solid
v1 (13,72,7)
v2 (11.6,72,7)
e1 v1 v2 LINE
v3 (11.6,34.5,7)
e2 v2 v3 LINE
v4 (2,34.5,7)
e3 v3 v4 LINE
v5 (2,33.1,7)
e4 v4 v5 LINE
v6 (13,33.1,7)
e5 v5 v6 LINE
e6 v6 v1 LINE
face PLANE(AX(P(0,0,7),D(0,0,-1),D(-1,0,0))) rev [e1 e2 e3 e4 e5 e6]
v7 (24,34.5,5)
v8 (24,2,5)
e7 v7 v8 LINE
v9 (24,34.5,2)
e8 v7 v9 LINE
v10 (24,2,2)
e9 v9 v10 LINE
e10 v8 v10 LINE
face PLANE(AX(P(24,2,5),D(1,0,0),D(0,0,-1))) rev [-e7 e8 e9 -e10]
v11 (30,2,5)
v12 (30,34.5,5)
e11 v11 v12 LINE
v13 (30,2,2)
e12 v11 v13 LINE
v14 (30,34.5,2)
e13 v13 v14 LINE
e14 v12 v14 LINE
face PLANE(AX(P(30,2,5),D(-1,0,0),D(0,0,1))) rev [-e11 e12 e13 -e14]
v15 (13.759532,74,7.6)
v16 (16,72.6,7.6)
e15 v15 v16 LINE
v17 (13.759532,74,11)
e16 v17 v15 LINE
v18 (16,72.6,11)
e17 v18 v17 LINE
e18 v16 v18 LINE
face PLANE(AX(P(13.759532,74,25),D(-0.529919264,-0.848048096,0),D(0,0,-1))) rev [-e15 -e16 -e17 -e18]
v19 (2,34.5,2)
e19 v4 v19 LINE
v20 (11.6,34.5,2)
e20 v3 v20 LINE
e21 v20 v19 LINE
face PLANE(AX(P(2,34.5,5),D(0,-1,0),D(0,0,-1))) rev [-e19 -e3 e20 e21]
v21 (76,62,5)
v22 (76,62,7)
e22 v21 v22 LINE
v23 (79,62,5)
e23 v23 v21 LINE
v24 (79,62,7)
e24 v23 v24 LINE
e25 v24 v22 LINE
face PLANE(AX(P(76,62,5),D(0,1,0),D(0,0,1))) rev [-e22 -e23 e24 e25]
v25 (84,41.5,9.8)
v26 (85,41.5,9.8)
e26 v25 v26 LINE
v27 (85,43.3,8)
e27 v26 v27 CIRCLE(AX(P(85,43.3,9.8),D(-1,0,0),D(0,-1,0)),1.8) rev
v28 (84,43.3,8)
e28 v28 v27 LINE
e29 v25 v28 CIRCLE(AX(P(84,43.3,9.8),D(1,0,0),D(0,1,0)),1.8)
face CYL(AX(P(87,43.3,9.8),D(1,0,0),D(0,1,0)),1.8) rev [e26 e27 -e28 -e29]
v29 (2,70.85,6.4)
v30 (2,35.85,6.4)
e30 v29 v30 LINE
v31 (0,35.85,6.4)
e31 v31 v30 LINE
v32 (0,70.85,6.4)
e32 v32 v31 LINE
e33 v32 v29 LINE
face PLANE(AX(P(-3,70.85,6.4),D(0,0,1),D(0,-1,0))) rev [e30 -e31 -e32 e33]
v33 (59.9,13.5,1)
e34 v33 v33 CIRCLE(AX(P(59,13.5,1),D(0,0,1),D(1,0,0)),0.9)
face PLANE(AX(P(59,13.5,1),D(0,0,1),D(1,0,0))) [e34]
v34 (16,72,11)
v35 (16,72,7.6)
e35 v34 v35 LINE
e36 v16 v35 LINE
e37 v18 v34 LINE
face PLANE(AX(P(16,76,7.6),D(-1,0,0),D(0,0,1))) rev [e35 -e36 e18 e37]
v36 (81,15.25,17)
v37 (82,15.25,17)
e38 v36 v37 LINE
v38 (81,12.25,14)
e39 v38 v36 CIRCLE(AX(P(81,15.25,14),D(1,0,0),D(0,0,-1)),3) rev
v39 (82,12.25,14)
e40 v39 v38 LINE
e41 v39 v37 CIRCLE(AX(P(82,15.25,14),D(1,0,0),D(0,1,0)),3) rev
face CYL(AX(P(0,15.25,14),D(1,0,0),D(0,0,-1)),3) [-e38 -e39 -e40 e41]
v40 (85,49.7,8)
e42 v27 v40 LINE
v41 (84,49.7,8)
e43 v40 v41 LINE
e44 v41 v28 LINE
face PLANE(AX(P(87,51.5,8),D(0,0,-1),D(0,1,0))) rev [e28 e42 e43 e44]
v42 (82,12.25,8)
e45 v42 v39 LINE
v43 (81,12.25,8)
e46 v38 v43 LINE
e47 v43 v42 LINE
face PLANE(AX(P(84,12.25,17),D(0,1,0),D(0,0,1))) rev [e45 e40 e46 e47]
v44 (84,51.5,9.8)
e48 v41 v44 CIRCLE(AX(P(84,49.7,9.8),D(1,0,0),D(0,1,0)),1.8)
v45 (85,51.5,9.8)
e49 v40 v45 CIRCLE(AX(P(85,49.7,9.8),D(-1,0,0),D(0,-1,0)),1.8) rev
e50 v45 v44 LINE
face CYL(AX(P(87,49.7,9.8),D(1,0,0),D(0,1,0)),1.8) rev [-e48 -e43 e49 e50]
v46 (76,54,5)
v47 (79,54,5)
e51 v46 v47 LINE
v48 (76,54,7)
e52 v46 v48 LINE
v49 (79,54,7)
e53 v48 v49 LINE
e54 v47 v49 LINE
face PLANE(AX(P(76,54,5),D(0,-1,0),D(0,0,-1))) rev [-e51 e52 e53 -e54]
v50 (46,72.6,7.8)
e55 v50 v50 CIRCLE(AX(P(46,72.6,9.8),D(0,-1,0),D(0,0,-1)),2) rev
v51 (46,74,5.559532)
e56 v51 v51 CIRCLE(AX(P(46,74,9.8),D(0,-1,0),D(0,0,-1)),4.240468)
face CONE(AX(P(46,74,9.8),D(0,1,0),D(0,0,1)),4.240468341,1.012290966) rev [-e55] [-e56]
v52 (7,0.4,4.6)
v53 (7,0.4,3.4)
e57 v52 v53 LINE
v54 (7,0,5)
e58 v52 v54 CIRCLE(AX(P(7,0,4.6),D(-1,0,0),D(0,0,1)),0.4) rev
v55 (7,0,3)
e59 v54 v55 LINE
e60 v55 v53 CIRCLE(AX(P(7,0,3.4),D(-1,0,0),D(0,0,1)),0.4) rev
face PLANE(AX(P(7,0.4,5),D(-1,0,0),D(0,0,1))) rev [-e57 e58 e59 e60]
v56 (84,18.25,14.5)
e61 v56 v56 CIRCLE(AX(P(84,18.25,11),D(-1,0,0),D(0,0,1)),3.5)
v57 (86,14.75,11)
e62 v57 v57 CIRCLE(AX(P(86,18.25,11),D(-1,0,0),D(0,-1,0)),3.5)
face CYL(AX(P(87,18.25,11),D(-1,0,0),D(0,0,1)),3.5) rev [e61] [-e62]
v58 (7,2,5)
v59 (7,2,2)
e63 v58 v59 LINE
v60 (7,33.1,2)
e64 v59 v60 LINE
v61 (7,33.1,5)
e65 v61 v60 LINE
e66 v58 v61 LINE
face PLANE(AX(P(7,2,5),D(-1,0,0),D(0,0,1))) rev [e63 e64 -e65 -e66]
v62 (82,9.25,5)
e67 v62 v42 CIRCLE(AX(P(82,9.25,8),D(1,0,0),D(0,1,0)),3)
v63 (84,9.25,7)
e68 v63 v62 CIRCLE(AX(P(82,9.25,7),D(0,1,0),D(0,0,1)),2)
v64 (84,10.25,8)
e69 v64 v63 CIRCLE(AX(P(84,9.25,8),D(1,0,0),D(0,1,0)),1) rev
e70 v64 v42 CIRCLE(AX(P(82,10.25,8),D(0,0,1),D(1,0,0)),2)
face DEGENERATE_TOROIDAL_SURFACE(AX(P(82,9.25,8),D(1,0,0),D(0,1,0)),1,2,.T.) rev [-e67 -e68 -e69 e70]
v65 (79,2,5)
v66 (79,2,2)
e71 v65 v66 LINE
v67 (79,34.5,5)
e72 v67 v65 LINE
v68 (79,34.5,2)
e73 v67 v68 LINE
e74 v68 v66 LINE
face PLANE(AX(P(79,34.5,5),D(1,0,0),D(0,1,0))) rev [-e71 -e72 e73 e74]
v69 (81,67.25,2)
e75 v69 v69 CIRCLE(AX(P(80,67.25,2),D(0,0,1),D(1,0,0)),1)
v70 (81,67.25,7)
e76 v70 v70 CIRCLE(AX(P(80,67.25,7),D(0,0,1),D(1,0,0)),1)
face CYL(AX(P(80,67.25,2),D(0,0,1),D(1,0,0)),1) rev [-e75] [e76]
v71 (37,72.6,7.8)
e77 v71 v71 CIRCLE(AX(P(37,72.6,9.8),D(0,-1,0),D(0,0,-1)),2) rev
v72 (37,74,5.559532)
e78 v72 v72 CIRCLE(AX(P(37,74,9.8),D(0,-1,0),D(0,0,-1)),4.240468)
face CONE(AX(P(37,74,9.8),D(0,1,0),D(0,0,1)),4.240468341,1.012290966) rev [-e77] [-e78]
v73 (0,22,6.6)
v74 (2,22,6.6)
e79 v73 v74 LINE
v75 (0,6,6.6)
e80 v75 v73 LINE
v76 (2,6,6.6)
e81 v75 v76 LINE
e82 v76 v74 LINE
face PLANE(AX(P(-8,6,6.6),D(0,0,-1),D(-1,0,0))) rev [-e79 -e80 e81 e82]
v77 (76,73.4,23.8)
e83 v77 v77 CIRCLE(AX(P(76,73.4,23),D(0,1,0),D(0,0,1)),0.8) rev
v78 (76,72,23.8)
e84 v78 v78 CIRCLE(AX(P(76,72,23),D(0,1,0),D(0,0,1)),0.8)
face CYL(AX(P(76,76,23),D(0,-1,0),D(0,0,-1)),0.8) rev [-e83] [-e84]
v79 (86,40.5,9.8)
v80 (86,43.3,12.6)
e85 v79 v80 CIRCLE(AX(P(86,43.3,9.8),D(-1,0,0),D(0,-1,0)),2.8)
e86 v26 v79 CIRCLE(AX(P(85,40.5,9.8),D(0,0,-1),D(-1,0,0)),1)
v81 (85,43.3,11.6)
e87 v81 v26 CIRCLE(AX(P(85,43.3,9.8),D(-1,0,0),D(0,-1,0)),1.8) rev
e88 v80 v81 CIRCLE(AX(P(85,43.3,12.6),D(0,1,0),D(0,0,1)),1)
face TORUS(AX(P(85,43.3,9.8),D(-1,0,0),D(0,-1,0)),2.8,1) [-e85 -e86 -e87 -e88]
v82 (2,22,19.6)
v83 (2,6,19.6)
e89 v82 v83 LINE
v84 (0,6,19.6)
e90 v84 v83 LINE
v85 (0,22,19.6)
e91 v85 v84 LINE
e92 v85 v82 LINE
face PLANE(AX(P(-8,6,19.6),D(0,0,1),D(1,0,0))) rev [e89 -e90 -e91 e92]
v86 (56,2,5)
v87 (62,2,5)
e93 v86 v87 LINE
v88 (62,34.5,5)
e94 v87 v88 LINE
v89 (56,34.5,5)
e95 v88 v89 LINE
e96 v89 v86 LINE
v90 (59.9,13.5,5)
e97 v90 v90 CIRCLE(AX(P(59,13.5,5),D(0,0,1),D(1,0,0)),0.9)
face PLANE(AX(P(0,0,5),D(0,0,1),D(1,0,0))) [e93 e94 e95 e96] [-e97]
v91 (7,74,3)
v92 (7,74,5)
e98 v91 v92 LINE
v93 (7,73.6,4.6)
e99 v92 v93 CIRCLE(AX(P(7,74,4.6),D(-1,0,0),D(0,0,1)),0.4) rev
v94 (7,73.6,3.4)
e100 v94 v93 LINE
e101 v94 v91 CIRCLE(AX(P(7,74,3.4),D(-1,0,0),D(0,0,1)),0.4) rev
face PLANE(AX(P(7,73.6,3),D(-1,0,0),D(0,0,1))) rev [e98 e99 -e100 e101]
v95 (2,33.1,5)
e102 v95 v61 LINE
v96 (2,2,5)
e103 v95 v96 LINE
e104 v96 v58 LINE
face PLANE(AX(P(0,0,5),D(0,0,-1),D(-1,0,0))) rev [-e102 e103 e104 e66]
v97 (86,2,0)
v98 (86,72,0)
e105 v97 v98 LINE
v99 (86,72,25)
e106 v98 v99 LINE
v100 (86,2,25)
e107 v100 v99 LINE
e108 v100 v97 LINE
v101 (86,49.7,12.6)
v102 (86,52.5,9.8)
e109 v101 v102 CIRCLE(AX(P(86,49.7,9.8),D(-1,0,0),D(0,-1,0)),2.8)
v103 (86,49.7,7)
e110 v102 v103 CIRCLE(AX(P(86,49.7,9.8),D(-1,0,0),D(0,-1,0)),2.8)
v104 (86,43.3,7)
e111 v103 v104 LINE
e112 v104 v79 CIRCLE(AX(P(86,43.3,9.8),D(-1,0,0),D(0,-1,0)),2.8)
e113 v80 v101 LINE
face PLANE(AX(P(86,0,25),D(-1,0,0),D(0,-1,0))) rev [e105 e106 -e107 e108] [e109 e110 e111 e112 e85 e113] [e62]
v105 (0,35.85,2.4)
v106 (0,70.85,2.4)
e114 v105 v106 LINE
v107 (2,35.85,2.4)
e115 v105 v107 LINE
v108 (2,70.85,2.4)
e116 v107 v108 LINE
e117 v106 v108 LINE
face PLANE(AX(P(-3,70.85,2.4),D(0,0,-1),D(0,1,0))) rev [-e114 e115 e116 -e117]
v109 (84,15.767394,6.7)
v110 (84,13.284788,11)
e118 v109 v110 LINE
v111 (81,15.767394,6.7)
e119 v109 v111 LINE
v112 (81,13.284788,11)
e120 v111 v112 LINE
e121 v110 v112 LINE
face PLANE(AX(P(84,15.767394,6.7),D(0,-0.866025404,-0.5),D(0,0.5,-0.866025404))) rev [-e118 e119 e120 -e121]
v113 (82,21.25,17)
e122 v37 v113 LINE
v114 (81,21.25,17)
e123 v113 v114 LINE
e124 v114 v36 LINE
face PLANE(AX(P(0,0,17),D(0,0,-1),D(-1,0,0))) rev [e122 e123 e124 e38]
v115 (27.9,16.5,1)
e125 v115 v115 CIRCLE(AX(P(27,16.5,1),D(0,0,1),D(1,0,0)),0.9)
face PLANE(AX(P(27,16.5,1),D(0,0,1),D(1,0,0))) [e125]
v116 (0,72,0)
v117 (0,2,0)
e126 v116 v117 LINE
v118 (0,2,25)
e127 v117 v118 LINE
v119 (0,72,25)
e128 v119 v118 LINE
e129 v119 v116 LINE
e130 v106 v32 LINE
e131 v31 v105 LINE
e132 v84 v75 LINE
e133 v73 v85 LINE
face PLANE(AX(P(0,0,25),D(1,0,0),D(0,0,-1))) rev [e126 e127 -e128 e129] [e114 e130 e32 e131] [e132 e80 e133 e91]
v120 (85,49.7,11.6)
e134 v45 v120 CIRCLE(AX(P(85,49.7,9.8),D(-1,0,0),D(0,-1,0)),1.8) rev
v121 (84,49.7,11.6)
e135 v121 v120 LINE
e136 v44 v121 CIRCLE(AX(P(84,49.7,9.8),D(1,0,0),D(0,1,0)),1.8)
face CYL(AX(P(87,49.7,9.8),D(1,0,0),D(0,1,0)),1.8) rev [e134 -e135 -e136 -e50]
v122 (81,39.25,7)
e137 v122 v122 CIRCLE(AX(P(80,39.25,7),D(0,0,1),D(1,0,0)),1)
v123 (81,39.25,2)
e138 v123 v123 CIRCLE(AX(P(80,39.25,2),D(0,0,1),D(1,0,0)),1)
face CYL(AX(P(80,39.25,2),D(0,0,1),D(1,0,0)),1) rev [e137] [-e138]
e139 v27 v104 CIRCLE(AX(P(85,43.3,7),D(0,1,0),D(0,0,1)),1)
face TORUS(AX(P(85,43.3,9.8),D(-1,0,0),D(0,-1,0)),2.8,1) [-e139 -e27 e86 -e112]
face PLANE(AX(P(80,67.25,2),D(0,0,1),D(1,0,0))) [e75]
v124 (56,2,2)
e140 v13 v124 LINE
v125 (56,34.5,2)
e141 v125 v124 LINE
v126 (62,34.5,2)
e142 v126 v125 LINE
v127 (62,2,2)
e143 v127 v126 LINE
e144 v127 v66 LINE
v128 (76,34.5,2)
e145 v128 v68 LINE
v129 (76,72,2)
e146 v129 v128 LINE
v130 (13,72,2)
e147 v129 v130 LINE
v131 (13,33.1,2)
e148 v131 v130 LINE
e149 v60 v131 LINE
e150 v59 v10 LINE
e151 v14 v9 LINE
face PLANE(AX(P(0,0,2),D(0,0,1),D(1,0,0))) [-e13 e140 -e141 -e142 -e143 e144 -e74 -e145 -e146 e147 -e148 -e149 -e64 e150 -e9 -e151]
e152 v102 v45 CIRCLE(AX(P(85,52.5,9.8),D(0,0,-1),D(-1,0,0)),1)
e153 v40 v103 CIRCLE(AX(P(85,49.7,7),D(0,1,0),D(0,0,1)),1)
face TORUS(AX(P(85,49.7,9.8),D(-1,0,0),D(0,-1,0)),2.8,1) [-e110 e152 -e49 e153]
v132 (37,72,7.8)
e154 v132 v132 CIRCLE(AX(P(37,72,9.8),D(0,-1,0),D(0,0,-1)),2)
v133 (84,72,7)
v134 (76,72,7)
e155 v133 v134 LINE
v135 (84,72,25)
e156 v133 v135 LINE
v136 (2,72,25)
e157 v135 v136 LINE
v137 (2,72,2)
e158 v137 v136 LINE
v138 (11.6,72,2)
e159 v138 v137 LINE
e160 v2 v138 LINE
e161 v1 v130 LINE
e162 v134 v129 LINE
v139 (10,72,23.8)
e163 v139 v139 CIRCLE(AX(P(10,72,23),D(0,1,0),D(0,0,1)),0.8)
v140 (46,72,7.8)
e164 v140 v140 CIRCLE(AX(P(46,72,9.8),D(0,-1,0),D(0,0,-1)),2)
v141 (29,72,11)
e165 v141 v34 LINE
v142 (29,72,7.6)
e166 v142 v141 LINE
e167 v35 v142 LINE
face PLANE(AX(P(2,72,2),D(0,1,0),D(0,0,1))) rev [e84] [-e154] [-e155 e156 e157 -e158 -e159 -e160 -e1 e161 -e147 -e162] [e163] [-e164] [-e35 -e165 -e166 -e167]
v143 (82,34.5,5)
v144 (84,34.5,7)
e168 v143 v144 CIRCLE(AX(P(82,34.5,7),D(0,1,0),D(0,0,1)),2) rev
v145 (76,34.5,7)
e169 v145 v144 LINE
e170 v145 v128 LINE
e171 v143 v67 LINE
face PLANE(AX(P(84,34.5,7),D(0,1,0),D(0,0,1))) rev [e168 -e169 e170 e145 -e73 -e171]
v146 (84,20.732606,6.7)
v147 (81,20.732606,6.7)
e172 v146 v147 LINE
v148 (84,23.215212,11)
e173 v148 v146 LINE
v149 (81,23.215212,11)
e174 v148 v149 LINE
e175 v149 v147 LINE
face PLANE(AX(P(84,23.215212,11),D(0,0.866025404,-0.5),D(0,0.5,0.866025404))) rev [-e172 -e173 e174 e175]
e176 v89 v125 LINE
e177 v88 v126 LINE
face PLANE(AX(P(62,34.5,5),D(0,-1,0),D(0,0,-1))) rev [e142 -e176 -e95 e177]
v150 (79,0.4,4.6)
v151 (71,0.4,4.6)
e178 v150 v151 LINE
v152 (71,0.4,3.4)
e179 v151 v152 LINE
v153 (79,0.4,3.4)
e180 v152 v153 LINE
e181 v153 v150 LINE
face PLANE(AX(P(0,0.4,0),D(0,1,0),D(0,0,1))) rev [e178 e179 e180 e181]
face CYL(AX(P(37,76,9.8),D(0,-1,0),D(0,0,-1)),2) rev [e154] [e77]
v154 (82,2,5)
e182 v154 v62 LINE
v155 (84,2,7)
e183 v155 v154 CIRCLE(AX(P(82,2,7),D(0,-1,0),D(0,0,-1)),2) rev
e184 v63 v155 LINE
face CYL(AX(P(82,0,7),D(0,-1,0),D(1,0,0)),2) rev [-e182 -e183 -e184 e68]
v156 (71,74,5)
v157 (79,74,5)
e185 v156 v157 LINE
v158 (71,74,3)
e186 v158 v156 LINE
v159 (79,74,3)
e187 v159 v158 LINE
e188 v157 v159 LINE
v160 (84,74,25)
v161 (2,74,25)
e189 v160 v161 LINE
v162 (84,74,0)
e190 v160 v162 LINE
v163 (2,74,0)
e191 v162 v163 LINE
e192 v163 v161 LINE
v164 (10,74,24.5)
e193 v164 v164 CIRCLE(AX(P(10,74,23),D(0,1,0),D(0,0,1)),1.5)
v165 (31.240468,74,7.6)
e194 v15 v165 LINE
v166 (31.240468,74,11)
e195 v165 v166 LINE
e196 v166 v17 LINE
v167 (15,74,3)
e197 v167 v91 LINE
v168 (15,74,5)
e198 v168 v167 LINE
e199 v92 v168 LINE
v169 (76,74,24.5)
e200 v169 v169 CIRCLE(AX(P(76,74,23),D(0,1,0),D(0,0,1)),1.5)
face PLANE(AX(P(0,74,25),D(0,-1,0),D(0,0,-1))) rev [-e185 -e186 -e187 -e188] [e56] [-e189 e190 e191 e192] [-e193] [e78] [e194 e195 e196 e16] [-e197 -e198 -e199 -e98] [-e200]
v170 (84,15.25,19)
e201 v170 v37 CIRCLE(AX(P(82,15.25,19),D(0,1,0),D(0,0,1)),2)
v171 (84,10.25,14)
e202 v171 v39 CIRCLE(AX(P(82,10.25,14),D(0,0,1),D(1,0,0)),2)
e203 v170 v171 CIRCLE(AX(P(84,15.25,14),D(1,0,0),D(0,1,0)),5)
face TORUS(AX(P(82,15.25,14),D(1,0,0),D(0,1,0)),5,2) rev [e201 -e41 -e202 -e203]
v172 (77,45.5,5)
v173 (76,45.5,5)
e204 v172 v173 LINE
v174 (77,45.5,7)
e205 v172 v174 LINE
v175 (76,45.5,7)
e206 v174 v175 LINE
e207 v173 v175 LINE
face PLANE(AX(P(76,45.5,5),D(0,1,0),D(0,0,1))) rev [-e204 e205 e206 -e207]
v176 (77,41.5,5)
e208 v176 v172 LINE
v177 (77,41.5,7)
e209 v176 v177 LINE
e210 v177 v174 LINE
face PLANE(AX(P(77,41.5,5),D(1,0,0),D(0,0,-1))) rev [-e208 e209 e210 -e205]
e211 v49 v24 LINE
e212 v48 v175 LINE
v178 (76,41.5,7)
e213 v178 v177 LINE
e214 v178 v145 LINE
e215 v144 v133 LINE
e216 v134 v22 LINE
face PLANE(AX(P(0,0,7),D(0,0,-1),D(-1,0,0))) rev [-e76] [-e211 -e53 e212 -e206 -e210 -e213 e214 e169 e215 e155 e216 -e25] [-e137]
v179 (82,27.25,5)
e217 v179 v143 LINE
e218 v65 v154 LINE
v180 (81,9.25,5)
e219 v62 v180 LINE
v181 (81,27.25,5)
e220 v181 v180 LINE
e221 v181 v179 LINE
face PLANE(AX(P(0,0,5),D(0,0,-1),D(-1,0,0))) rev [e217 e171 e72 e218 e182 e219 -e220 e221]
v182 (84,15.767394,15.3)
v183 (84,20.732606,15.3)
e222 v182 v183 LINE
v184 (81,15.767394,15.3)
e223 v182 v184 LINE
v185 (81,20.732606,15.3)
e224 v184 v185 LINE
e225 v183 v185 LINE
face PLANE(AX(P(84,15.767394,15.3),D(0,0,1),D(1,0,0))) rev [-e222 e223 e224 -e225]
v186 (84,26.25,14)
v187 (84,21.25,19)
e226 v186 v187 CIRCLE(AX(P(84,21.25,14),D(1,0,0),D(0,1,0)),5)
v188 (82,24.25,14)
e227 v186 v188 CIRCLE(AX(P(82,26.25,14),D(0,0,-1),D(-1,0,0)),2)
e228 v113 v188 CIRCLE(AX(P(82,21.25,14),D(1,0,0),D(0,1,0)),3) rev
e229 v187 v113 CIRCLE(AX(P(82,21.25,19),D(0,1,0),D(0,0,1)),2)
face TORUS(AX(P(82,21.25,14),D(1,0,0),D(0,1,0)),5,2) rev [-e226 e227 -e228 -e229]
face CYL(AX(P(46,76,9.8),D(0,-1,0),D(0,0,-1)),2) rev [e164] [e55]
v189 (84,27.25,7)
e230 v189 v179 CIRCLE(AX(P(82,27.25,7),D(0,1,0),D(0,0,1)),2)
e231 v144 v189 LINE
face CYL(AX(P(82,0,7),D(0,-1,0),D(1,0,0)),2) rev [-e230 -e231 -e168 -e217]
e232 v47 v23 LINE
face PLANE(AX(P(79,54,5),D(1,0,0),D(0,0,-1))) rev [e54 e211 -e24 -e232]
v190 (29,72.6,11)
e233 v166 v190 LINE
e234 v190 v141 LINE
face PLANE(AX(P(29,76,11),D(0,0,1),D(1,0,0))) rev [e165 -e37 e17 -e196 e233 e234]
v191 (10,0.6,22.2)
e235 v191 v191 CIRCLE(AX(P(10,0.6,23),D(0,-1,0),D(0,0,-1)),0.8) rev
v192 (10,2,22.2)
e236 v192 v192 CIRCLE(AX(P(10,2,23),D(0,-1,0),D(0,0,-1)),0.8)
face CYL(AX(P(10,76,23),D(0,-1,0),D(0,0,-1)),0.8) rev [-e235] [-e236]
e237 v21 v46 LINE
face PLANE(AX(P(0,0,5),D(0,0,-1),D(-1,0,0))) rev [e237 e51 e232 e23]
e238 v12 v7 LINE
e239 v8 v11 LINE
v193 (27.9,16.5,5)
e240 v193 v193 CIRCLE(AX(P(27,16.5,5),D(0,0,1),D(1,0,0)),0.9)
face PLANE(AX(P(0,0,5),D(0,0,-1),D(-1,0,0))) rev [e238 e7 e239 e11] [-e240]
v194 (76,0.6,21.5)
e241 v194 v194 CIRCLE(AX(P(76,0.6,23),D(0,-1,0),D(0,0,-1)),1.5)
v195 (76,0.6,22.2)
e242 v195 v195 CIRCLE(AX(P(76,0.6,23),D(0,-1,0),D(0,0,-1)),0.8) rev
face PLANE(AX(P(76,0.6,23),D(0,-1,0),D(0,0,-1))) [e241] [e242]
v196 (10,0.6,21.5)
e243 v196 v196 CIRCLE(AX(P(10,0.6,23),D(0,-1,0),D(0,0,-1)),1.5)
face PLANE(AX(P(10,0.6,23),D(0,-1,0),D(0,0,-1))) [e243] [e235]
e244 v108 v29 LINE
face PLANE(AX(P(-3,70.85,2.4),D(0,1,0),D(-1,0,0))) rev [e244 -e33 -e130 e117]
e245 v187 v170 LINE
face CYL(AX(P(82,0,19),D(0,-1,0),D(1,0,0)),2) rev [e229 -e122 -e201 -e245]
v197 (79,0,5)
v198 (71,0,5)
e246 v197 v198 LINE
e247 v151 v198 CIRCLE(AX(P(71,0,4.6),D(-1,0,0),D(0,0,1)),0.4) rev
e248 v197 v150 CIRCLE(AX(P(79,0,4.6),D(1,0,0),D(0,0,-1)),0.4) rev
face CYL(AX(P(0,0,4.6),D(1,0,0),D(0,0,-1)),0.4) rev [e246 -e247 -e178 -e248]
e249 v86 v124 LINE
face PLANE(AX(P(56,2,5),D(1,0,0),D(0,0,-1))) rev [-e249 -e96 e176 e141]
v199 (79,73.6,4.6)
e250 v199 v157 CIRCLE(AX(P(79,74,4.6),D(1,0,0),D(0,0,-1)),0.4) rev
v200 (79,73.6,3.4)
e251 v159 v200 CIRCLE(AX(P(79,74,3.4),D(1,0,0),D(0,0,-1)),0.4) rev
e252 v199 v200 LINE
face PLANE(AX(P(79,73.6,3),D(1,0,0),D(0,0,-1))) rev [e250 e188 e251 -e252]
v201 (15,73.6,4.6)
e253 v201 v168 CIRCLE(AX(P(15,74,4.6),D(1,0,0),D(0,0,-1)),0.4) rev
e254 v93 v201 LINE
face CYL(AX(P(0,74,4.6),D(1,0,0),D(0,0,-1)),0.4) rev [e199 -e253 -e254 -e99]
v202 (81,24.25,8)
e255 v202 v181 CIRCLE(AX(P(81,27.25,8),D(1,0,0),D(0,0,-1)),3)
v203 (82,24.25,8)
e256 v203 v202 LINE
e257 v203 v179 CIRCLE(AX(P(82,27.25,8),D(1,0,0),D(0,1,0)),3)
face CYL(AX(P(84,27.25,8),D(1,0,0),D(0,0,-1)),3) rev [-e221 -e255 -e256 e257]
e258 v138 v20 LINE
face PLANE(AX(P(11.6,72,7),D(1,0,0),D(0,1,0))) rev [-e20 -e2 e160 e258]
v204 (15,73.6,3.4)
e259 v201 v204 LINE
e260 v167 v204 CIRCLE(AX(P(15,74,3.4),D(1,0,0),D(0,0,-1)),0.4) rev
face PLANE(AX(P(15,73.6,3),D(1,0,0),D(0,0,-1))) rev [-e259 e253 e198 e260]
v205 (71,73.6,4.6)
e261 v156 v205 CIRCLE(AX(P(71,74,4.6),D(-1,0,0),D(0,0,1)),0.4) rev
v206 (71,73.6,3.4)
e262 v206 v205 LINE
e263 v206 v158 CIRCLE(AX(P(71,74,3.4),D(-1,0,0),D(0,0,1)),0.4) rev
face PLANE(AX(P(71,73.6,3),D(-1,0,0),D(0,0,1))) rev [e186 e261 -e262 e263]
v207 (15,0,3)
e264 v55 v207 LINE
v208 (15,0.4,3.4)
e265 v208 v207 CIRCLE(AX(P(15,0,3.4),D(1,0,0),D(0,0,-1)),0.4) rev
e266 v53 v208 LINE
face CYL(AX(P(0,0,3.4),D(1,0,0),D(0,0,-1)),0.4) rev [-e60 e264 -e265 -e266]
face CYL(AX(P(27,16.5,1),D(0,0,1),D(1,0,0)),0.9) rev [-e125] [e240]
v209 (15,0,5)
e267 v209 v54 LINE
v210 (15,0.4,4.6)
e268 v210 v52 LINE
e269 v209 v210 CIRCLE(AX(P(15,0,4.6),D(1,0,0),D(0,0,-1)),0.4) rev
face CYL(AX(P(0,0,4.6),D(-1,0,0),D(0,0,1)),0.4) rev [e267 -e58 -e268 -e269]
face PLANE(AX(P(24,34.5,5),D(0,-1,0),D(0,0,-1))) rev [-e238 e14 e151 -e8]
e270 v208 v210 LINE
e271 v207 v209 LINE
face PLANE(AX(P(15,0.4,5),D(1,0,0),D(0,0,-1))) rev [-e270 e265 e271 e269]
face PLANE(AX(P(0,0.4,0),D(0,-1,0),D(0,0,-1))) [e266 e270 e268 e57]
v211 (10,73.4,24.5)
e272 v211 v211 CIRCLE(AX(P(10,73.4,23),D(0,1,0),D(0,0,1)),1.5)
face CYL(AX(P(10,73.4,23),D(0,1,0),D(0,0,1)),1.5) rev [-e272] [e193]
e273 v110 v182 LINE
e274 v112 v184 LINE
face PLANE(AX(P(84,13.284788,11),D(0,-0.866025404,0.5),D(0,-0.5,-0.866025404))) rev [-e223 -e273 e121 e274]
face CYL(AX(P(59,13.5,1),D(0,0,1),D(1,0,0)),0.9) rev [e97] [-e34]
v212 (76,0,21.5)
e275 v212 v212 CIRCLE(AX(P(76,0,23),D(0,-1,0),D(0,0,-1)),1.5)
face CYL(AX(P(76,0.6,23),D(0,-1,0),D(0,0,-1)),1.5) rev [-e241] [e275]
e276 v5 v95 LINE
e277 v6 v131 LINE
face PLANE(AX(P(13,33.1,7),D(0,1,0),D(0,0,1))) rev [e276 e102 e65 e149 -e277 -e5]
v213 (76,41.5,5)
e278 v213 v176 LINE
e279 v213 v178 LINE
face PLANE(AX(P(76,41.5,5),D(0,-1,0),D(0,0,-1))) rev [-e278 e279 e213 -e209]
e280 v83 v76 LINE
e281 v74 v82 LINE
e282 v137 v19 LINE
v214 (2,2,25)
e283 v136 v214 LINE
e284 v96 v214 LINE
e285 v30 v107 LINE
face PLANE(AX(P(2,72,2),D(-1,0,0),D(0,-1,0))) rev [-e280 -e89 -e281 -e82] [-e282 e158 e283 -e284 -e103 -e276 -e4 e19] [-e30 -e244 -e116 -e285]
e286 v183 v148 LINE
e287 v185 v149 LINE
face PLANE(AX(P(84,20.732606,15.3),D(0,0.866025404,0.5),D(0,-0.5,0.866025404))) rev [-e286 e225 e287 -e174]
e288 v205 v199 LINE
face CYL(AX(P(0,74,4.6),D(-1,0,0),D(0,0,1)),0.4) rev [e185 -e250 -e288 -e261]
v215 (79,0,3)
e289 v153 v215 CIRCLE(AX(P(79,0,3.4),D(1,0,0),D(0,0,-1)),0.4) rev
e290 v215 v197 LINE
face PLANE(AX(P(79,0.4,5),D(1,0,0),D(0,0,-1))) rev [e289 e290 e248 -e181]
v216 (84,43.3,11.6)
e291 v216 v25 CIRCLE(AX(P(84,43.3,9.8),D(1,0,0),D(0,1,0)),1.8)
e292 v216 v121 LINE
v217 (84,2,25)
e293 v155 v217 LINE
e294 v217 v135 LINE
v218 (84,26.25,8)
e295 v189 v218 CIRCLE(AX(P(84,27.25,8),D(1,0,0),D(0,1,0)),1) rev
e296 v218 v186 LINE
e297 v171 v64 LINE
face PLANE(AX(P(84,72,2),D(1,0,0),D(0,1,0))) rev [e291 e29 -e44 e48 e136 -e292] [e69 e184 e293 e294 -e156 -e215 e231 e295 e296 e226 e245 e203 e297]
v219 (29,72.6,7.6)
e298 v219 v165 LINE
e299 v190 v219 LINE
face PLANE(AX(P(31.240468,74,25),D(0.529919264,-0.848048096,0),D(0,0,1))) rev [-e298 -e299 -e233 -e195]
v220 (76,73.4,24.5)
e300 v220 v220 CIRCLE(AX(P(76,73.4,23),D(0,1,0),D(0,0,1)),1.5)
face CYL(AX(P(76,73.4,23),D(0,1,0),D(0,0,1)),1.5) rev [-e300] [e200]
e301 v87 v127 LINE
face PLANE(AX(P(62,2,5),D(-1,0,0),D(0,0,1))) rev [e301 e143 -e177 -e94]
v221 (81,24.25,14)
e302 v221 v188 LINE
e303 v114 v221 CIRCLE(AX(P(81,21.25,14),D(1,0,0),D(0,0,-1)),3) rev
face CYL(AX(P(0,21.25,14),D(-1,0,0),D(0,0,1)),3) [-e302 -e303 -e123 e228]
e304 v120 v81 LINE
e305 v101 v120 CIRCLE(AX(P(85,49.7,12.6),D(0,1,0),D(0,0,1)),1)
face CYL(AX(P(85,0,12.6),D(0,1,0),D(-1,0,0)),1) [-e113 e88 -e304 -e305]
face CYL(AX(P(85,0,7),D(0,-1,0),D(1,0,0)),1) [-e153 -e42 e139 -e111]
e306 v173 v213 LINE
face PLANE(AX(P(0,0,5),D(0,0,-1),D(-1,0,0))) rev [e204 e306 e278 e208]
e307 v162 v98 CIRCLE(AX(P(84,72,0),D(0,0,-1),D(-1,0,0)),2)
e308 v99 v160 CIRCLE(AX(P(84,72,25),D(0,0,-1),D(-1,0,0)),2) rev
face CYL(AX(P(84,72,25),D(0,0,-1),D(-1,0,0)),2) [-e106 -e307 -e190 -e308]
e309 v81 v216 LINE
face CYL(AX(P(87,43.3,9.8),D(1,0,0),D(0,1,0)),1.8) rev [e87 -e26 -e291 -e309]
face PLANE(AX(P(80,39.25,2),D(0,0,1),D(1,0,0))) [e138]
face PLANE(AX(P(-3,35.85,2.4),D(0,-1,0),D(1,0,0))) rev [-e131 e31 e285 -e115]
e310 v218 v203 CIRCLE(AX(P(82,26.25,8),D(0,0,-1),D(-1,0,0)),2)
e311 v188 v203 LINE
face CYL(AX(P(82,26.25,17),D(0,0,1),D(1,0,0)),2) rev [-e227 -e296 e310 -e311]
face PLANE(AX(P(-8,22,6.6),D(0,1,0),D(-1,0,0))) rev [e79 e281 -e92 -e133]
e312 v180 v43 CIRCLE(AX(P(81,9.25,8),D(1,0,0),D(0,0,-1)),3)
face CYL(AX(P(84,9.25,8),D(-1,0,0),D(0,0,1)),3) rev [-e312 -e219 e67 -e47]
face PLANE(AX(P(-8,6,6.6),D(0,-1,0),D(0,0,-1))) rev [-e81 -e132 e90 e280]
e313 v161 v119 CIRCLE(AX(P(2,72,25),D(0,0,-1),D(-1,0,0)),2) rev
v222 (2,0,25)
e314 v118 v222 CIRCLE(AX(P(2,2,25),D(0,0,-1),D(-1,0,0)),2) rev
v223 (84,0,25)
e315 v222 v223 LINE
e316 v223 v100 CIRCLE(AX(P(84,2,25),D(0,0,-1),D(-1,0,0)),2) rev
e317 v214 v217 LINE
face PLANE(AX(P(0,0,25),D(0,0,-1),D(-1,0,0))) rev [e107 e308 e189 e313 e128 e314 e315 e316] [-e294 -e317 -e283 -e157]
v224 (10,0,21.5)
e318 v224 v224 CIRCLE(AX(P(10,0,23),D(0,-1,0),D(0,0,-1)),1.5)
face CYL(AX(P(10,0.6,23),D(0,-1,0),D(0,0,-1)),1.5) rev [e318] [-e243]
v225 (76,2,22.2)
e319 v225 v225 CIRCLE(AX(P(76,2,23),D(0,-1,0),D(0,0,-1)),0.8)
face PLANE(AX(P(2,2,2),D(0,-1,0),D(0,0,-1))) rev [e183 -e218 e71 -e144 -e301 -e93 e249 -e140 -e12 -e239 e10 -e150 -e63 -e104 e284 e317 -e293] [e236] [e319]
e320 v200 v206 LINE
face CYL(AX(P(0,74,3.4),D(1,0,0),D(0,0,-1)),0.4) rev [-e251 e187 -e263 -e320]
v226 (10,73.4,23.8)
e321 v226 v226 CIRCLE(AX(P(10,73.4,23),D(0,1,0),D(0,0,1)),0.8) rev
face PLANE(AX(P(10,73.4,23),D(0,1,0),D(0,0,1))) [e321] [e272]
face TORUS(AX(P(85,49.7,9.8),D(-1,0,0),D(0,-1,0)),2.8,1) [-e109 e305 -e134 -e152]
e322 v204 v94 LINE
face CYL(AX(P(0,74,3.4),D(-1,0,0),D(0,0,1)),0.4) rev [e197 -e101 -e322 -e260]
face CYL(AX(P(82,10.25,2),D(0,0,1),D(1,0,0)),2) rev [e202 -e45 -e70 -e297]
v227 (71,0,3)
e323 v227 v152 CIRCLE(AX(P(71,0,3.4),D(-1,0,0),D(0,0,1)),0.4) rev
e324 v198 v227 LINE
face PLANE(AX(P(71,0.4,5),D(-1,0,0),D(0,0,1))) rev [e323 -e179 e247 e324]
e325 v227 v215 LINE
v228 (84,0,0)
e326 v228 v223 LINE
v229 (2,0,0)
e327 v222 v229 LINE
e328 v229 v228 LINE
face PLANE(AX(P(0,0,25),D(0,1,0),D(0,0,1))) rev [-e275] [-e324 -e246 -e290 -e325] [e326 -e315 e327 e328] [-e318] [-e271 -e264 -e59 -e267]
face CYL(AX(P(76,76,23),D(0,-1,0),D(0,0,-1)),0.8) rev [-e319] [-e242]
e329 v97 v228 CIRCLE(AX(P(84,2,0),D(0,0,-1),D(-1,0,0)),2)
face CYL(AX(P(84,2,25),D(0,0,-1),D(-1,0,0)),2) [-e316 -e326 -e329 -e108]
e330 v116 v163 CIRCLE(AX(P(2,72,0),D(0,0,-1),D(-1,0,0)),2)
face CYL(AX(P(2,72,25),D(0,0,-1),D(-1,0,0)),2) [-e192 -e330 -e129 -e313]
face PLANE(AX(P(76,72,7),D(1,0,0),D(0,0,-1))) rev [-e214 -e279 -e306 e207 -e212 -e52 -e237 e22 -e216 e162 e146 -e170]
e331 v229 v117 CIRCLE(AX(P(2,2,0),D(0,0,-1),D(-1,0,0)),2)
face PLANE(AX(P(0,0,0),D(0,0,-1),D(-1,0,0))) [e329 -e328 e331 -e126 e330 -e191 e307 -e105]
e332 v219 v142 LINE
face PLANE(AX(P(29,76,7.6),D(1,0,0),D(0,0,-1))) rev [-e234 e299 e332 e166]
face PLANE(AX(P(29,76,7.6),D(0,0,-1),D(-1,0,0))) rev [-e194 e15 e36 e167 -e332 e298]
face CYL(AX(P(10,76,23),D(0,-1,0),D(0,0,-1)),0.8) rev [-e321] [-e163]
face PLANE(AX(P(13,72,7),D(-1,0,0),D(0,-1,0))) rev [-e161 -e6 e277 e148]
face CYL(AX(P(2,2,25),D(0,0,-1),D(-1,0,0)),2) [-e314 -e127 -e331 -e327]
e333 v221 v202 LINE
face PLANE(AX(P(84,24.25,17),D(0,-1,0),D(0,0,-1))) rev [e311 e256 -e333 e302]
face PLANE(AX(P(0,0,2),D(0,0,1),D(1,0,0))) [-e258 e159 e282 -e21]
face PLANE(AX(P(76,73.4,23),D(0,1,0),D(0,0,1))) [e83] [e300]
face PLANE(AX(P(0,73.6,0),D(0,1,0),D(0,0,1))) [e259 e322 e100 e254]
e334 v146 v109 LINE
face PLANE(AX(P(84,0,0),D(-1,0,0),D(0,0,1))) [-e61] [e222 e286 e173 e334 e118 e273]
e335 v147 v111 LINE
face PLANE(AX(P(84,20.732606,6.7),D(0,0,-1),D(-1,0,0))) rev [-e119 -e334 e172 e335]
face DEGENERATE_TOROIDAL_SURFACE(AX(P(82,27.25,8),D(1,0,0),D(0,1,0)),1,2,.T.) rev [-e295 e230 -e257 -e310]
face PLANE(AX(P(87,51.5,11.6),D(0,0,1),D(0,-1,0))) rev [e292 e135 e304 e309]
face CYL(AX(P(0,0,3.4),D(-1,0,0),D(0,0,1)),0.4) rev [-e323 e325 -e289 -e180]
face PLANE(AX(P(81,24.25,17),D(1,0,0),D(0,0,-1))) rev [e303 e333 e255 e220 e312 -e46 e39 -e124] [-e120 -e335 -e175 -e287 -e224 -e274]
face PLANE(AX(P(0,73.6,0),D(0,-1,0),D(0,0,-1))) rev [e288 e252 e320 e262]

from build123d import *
from OCP.BRepFilletAPI import BRepFilletAPI_MakeChamfer

# Parameters (mm, degrees)
SKETCH1_W           = 86
SKETCH1_H           = 74
BOSS_EXTRUDE1_DEPTH = 25
SKETCH3_W           = 82
SKETCH3_H           = 70
CUT_EXTRUDE1_DEPTH  = 23
SKETCH4_W           = 8
SKETCH4_H           = 37.5
SKETCH4_W_2         = 1.4
BOSS_EXTRUDE2_DEPTH = 5
SKETCH5_W           = 3
SKETCH5_H           = 8
SKETCH5_W_2         = 1
SKETCH5_H_2         = 4
CUT_EXTRUDE2_DEPTH  = 2
SKETCH6_R           = 1
CUT_EXTRUDE3_DEPTH  = 5
SKETCH7_W           = 4
SKETCH7_H           = 35
CUT_EXTRUDE4_DEPTH  = 5
SKETCH9_W           = 5
SKETCH9_H           = 32.5
SKETCH9_W_2         = 6
BOSS_EXTRUDE3_DEPTH = 3
SKETCH10_R          = 0.9
CUT_EXTRUDE6_DEPTH  = 4
FILLET1_R           = 2
SKETCH13_R          = 2
SKETCH13_W          = 13
SKETCH13_H          = 3.4
CUT_EXTRUDE9_DEPTH  = 4
CHAMFER1_SIZE       = 1.4
CHAMFER1_SIZE2      = 2.240468341
SKETCH14_R          = 0.8
CUT_EXTRUDE10_DEPTH = 76
SKETCH15_R          = 1.5
CUT_EXTRUDE11_DEPTH = 0.6
CUT_EXTRUDE12_START = -0.6
SKETCH16_R          = 1.5
CUT_EXTRUDE12_DEPTH = 0.6
SKETCH20_W          = 11
SKETCH20_H          = 1.4
BOSS_EXTRUDE6_DEPTH = 5
SKETCH21_W          = 13
SKETCH21_H          = 16
CUT_EXTRUDE13_DEPTH = 10
SKETCH22_W          = 3
SKETCH22_H          = 12
BOSS_EXTRUDE7_DEPTH = 12
CUT_EXTRUDE14_DEPTH = 3
SKETCH24_R          = 3.5
CUT_EXTRUDE15_DEPTH = 3
FILLET2_R           = 3
SKETCH27_W          = 3.6
SKETCH27_H          = 10
CUT_EXTRUDE16_DEPTH = 3
FILLET3_R           = 1.8
FILLET4_R           = 1
FILLET5_R           = 2
SKETCH28_W          = 8
SKETCH28_H          = 2
CUT_EXTRUDE17_DEPTH = 0.4
SKETCH29_W          = 8
SKETCH29_H          = 2
CUT_EXTRUDE18_DEPTH = 0.4
FILLET6_R           = 0.4


with BuildPart() as part:
    # Sketch1 → Boss-Extrude1 (new body)
    with BuildSketch(Plane.XY):
        with Locations((43, 37)):
            Rectangle(SKETCH1_W, SKETCH1_H)
    extrude(amount=BOSS_EXTRUDE1_DEPTH)

    # Sketch3 → Cut-Extrude1 (cut)
    with BuildSketch(Plane.XY.offset(25)):
        with Locations((43, 37)):
            Rectangle(SKETCH3_W, SKETCH3_H)
    extrude(amount=-CUT_EXTRUDE1_DEPTH, mode=Mode.SUBTRACT)

    # Sketch4 → Boss-Extrude2 (add)
    with BuildSketch(Plane.XY.offset(2)):
        with Locations((80, 53.25)):
            Rectangle(SKETCH4_W, SKETCH4_H)
        with Locations((12.3, 53.25)):
            Rectangle(SKETCH4_W_2, SKETCH4_H)
    extrude(amount=BOSS_EXTRUDE2_DEPTH)

    # Sketch5 → Cut-Extrude2 (cut)
    with BuildSketch(Plane.XY.offset(7)):
        with Locations((77.5, 58)):
            Rectangle(SKETCH5_W, SKETCH5_H)
        with Locations((76.5, 43.5)):
            Rectangle(SKETCH5_W_2, SKETCH5_H_2)
    extrude(amount=-CUT_EXTRUDE2_DEPTH, mode=Mode.SUBTRACT)

    # Sketch6 → Cut-Extrude3 (cut)
    with BuildSketch(Plane.XY.offset(7)):
        with Locations((80, 67.25)):
            Circle(SKETCH6_R)
        with Locations((80, 39.25)):
            Circle(SKETCH6_R)
    extrude(amount=-CUT_EXTRUDE3_DEPTH, mode=Mode.SUBTRACT)

    # Sketch7 → Cut-Extrude4 (cut)
    with BuildSketch(Plane(origin=(2, 0, 0), x_dir=(0, 0, -1), z_dir=(1, 0, 0))):
        with Locations((-4.4, 53.35)):
            Rectangle(SKETCH7_W, SKETCH7_H)
    extrude(amount=-CUT_EXTRUDE4_DEPTH, mode=Mode.SUBTRACT)

    # Sketch9 → Boss-Extrude3 (add)
    with BuildSketch(Plane.XY.offset(2)):
        with Locations((81.5, 18.25)):
            Rectangle(SKETCH9_W, SKETCH9_H)
        with Locations((59, 18.25)):
            Rectangle(SKETCH9_W_2, SKETCH9_H)
        with Locations((4.5, 18.25)):
            Rectangle(SKETCH9_W, SKETCH9_H)
        with Locations((27, 18.25)):
            Rectangle(SKETCH9_W_2, SKETCH9_H)
    extrude(amount=BOSS_EXTRUDE3_DEPTH)

    # Sketch10 → Cut-Extrude6 (cut)
    with BuildSketch(Plane.XY.offset(5)):
        with Locations((59, 13.5)):
            Circle(SKETCH10_R)
        with Locations((27, 16.5)):
            Circle(SKETCH10_R)
    extrude(amount=-CUT_EXTRUDE6_DEPTH, mode=Mode.SUBTRACT)

    # Fillet1
    fillet1_edges = [part.edges().sort_by_distance(p)[0] for p in [
        (0, 74, 12.5),
        (86, 74, 12.5),
        (86, 0, 12.5),
        (0, 0, 12.5),
    ]]
    fillet(fillet1_edges, radius=FILLET1_R)

    # Sketch13 → Cut-Extrude9 (cut)
    with BuildSketch(Plane(origin=(0, 72, 0), x_dir=(-1, 0, 0), z_dir=(0, -1, 0))):
        with Locations(Location((-37, -9.8, 0), (0, 0, 90))):
            Circle(SKETCH13_R)
        with Locations(Location((-46, -9.8, 0), (0, 0, 90))):
            Circle(SKETCH13_R)
        with Locations((-22.5, -9.3)):
            Rectangle(SKETCH13_W, SKETCH13_H)
    extrude(amount=-CUT_EXTRUDE9_DEPTH, mode=Mode.SUBTRACT)

    # Chamfer1: one chamfer whose edges measure the first distance from different faces: ONE call of the kernel's chamfer builder (chamfer() names one face for all edges)
    chamfer1_edges_1 = [part.edges().sort_by_distance(p)[0] for p in [
        (16, 74, 9.3),
    ]]
    chamfer1_side_1 = [part.faces().sort_by_distance(p)[0] for p in [
        (16, 73, 9.3),
    ]]
    chamfer1_edges_2 = [part.edges().sort_by_distance(p)[0] for p in [
        (29, 74, 9.3),
    ]]
    chamfer1_side_2 = [part.faces().sort_by_distance(p)[0] for p in [
        (29, 73, 9.3),
    ]]
    chamfer1_edges_3 = [part.edges().sort_by_distance(p)[0] for p in [
        (37, 74, 11.8),
    ]]
    chamfer1_side_3 = [part.faces().sort_by_distance(p)[0] for p in [
        (37, 73, 11.8),
    ]]
    chamfer1_edges_4 = [part.edges().sort_by_distance(p)[0] for p in [
        (46, 74, 11.8),
    ]]
    chamfer1_side_4 = [part.faces().sort_by_distance(p)[0] for p in [
        (46, 73, 11.8),
    ]]
    chamfer1 = BRepFilletAPI_MakeChamfer(part.part.solid().wrapped)
    for e in chamfer1_edges_1:
        chamfer1.Add(CHAMFER1_SIZE, CHAMFER1_SIZE2, e.wrapped, chamfer1_side_1[0].wrapped)  # the first distance lies on this face
    for e in chamfer1_edges_2:
        chamfer1.Add(CHAMFER1_SIZE, CHAMFER1_SIZE2, e.wrapped, chamfer1_side_2[0].wrapped)  # the first distance lies on this face
    for e in chamfer1_edges_3:
        chamfer1.Add(CHAMFER1_SIZE, CHAMFER1_SIZE2, e.wrapped, chamfer1_side_3[0].wrapped)  # the first distance lies on this face
    for e in chamfer1_edges_4:
        chamfer1.Add(CHAMFER1_SIZE, CHAMFER1_SIZE2, e.wrapped, chamfer1_side_4[0].wrapped)  # the first distance lies on this face
    add(Compound.cast(chamfer1.Shape()), mode=Mode.REPLACE)

    # Sketch14 → Cut-Extrude10 (cut)
    with BuildSketch(Plane(origin=(0, 0, 0), x_dir=(-1, 0, 0), z_dir=(0, -1, 0))):
        with Locations(Location((-10, -23, 0), (0, 0, 90))):
            Circle(SKETCH14_R)
        with Locations(Location((-76, -23, 0), (0, 0, 90))):
            Circle(SKETCH14_R)
    extrude(amount=-CUT_EXTRUDE10_DEPTH, mode=Mode.SUBTRACT)

    # Sketch15 → Cut-Extrude11 (cut)
    with BuildSketch(Plane(origin=(0, 0, 0), x_dir=(-1, 0, 0), z_dir=(0, -1, 0))):
        with Locations(Location((-10, -23, 0), (0, 0, 90))):
            Circle(SKETCH15_R)
        with Locations(Location((-76, -23, 0), (0, 0, 90))):
            Circle(SKETCH15_R)
    extrude(amount=-CUT_EXTRUDE11_DEPTH, mode=Mode.SUBTRACT)

    # Sketch16 → Cut-Extrude12 (cut)
    with BuildSketch(Plane(origin=(0, 74, 0), x_dir=(1, 0, 0), z_dir=(0, 1, 0)).offset(CUT_EXTRUDE12_START)):
        with Locations(Location((76, -23, 0), (0, 0, 90))):
            Circle(SKETCH16_R)
        with Locations(Location((10, -23, 0), (0, 0, 90))):
            Circle(SKETCH16_R)
    extrude(amount=CUT_EXTRUDE12_DEPTH, mode=Mode.SUBTRACT)

    # Sketch20 → Boss-Extrude6 (add)
    with BuildSketch(Plane.XY.offset(2)):
        with Locations((7.5, 33.8)):
            Rectangle(SKETCH20_W, SKETCH20_H)
    extrude(amount=BOSS_EXTRUDE6_DEPTH)

    # Sketch21 → Cut-Extrude13 (cut)
    with BuildSketch(Plane(origin=(2, 0, 0), x_dir=(0, 0, -1), z_dir=(1, 0, 0))):
        with Locations((-13.1, 14)):
            Rectangle(SKETCH21_W, SKETCH21_H)
    extrude(amount=-CUT_EXTRUDE13_DEPTH, mode=Mode.SUBTRACT)

    # Sketch22 → Boss-Extrude7 (add)
    with BuildSketch(Plane.XY.offset(5)):
        with Locations((82.5, 18.25)):
            Rectangle(SKETCH22_W, SKETCH22_H)
    extrude(amount=BOSS_EXTRUDE7_DEPTH)

    # Sketch23 → Cut-Extrude14 (cut)
    with BuildSketch(Plane.ZY.offset(-81)):
        Polygon((6.7, 15.767393842), (11, 13.284787685), (15.3, 15.767393842), (15.3, 20.732606158), (11, 23.215212315), (6.7, 20.732606158), align=None)
    extrude(amount=-CUT_EXTRUDE14_DEPTH, mode=Mode.SUBTRACT)

    # Sketch24 → Cut-Extrude15 (cut)
    with BuildSketch(Plane.ZY.offset(-84)):
        with Locations((11, 18.25)):
            Circle(SKETCH24_R)
    extrude(amount=-CUT_EXTRUDE15_DEPTH, mode=Mode.SUBTRACT)

    # Fillet2
    fillet2_edges = [part.edges().sort_by_distance(p)[0] for p in [
        (82.5, 24.25, 5),
        (82.5, 12.25, 5),
        (82.5, 24.25, 17),
        (82.5, 12.25, 17),
    ]]
    fillet(fillet2_edges, radius=FILLET2_R)

    # Sketch27 → Cut-Extrude16 (cut)
    with BuildSketch(Plane.ZY.offset(-84)):
        with Locations((9.8, 46.5)):
            Rectangle(SKETCH27_W, SKETCH27_H)
    extrude(amount=-CUT_EXTRUDE16_DEPTH, mode=Mode.SUBTRACT)

    # Fillet3
    fillet3_edges = [part.edges().sort_by_distance(p)[0] for p in [
        (85, 41.5, 8),
        (85, 41.5, 11.6),
        (85, 51.5, 8),
        (85, 51.5, 11.6),
    ]]
    fillet(fillet3_edges, radius=FILLET3_R - 0.0001)  # a hair under: the kernel refuses the full size

    # Fillet4
    fillet4_edges = [part.edges().sort_by_distance(p)[0] for p in [
        (86, 46.5, 8),
        (86, 46.5, 11.6),
        (86, 42.027178505, 8.527178505),
        (86, 42.027178505, 11.072821495),
        (86, 50.972821495, 8.527178505),
        (86, 50.972821495, 11.072821495),
    ]]
    fillet(fillet4_edges, radius=FILLET4_R)

    # Fillet5
    fillet5_edges = [part.edges().sort_by_distance(p)[0] for p in [
        (84, 5.625, 5),
        (84, 11.371320344, 5.878679656),
        (84, 12.25, 11),
        (84, 13.128679656, 16.121320344),
        (84, 30.875, 5),
        (84, 25.128679656, 5.878679656),
        (84, 24.25, 11),
        (84, 23.371320344, 16.121320344),
        (84, 18.25, 17),
    ]]
    fillet(fillet5_edges, radius=FILLET5_R)

    # Sketch28 → Cut-Extrude17 (cut)
    with BuildSketch(Plane(origin=(0, 0, 0), x_dir=(-1, 0, 0), z_dir=(0, -1, 0))):
        with Locations((-11, -4)):
            Rectangle(SKETCH28_W, SKETCH28_H)
        with Locations((-75, -4)):
            Rectangle(SKETCH28_W, SKETCH28_H)
    extrude(amount=-CUT_EXTRUDE17_DEPTH, mode=Mode.SUBTRACT)

    # Sketch29 → Cut-Extrude18 (cut)
    with BuildSketch(Plane(origin=(0, 74, 0), x_dir=(1, 0, 0), z_dir=(0, 1, 0))):
        with Locations((75, -4)):
            Rectangle(SKETCH29_W, SKETCH29_H)
        with Locations((11, -4)):
            Rectangle(SKETCH29_W, SKETCH29_H)
    extrude(amount=-CUT_EXTRUDE18_DEPTH, mode=Mode.SUBTRACT)

    # Fillet6
    fillet6_edges = [part.edges().sort_by_distance(p)[0] for p in [
        (75, 0.4, 5),
        (75, 0.4, 3),
        (11, 0.4, 3),
        (11, 0.4, 5),
        (11, 73.6, 5),
        (11, 73.6, 3),
        (75, 73.6, 3),
        (75, 73.6, 5),
    ]]
    fillet(fillet6_edges, radius=FILLET6_R - 0.0001)  # a hair under: the kernel refuses the full size


solid = part.part
